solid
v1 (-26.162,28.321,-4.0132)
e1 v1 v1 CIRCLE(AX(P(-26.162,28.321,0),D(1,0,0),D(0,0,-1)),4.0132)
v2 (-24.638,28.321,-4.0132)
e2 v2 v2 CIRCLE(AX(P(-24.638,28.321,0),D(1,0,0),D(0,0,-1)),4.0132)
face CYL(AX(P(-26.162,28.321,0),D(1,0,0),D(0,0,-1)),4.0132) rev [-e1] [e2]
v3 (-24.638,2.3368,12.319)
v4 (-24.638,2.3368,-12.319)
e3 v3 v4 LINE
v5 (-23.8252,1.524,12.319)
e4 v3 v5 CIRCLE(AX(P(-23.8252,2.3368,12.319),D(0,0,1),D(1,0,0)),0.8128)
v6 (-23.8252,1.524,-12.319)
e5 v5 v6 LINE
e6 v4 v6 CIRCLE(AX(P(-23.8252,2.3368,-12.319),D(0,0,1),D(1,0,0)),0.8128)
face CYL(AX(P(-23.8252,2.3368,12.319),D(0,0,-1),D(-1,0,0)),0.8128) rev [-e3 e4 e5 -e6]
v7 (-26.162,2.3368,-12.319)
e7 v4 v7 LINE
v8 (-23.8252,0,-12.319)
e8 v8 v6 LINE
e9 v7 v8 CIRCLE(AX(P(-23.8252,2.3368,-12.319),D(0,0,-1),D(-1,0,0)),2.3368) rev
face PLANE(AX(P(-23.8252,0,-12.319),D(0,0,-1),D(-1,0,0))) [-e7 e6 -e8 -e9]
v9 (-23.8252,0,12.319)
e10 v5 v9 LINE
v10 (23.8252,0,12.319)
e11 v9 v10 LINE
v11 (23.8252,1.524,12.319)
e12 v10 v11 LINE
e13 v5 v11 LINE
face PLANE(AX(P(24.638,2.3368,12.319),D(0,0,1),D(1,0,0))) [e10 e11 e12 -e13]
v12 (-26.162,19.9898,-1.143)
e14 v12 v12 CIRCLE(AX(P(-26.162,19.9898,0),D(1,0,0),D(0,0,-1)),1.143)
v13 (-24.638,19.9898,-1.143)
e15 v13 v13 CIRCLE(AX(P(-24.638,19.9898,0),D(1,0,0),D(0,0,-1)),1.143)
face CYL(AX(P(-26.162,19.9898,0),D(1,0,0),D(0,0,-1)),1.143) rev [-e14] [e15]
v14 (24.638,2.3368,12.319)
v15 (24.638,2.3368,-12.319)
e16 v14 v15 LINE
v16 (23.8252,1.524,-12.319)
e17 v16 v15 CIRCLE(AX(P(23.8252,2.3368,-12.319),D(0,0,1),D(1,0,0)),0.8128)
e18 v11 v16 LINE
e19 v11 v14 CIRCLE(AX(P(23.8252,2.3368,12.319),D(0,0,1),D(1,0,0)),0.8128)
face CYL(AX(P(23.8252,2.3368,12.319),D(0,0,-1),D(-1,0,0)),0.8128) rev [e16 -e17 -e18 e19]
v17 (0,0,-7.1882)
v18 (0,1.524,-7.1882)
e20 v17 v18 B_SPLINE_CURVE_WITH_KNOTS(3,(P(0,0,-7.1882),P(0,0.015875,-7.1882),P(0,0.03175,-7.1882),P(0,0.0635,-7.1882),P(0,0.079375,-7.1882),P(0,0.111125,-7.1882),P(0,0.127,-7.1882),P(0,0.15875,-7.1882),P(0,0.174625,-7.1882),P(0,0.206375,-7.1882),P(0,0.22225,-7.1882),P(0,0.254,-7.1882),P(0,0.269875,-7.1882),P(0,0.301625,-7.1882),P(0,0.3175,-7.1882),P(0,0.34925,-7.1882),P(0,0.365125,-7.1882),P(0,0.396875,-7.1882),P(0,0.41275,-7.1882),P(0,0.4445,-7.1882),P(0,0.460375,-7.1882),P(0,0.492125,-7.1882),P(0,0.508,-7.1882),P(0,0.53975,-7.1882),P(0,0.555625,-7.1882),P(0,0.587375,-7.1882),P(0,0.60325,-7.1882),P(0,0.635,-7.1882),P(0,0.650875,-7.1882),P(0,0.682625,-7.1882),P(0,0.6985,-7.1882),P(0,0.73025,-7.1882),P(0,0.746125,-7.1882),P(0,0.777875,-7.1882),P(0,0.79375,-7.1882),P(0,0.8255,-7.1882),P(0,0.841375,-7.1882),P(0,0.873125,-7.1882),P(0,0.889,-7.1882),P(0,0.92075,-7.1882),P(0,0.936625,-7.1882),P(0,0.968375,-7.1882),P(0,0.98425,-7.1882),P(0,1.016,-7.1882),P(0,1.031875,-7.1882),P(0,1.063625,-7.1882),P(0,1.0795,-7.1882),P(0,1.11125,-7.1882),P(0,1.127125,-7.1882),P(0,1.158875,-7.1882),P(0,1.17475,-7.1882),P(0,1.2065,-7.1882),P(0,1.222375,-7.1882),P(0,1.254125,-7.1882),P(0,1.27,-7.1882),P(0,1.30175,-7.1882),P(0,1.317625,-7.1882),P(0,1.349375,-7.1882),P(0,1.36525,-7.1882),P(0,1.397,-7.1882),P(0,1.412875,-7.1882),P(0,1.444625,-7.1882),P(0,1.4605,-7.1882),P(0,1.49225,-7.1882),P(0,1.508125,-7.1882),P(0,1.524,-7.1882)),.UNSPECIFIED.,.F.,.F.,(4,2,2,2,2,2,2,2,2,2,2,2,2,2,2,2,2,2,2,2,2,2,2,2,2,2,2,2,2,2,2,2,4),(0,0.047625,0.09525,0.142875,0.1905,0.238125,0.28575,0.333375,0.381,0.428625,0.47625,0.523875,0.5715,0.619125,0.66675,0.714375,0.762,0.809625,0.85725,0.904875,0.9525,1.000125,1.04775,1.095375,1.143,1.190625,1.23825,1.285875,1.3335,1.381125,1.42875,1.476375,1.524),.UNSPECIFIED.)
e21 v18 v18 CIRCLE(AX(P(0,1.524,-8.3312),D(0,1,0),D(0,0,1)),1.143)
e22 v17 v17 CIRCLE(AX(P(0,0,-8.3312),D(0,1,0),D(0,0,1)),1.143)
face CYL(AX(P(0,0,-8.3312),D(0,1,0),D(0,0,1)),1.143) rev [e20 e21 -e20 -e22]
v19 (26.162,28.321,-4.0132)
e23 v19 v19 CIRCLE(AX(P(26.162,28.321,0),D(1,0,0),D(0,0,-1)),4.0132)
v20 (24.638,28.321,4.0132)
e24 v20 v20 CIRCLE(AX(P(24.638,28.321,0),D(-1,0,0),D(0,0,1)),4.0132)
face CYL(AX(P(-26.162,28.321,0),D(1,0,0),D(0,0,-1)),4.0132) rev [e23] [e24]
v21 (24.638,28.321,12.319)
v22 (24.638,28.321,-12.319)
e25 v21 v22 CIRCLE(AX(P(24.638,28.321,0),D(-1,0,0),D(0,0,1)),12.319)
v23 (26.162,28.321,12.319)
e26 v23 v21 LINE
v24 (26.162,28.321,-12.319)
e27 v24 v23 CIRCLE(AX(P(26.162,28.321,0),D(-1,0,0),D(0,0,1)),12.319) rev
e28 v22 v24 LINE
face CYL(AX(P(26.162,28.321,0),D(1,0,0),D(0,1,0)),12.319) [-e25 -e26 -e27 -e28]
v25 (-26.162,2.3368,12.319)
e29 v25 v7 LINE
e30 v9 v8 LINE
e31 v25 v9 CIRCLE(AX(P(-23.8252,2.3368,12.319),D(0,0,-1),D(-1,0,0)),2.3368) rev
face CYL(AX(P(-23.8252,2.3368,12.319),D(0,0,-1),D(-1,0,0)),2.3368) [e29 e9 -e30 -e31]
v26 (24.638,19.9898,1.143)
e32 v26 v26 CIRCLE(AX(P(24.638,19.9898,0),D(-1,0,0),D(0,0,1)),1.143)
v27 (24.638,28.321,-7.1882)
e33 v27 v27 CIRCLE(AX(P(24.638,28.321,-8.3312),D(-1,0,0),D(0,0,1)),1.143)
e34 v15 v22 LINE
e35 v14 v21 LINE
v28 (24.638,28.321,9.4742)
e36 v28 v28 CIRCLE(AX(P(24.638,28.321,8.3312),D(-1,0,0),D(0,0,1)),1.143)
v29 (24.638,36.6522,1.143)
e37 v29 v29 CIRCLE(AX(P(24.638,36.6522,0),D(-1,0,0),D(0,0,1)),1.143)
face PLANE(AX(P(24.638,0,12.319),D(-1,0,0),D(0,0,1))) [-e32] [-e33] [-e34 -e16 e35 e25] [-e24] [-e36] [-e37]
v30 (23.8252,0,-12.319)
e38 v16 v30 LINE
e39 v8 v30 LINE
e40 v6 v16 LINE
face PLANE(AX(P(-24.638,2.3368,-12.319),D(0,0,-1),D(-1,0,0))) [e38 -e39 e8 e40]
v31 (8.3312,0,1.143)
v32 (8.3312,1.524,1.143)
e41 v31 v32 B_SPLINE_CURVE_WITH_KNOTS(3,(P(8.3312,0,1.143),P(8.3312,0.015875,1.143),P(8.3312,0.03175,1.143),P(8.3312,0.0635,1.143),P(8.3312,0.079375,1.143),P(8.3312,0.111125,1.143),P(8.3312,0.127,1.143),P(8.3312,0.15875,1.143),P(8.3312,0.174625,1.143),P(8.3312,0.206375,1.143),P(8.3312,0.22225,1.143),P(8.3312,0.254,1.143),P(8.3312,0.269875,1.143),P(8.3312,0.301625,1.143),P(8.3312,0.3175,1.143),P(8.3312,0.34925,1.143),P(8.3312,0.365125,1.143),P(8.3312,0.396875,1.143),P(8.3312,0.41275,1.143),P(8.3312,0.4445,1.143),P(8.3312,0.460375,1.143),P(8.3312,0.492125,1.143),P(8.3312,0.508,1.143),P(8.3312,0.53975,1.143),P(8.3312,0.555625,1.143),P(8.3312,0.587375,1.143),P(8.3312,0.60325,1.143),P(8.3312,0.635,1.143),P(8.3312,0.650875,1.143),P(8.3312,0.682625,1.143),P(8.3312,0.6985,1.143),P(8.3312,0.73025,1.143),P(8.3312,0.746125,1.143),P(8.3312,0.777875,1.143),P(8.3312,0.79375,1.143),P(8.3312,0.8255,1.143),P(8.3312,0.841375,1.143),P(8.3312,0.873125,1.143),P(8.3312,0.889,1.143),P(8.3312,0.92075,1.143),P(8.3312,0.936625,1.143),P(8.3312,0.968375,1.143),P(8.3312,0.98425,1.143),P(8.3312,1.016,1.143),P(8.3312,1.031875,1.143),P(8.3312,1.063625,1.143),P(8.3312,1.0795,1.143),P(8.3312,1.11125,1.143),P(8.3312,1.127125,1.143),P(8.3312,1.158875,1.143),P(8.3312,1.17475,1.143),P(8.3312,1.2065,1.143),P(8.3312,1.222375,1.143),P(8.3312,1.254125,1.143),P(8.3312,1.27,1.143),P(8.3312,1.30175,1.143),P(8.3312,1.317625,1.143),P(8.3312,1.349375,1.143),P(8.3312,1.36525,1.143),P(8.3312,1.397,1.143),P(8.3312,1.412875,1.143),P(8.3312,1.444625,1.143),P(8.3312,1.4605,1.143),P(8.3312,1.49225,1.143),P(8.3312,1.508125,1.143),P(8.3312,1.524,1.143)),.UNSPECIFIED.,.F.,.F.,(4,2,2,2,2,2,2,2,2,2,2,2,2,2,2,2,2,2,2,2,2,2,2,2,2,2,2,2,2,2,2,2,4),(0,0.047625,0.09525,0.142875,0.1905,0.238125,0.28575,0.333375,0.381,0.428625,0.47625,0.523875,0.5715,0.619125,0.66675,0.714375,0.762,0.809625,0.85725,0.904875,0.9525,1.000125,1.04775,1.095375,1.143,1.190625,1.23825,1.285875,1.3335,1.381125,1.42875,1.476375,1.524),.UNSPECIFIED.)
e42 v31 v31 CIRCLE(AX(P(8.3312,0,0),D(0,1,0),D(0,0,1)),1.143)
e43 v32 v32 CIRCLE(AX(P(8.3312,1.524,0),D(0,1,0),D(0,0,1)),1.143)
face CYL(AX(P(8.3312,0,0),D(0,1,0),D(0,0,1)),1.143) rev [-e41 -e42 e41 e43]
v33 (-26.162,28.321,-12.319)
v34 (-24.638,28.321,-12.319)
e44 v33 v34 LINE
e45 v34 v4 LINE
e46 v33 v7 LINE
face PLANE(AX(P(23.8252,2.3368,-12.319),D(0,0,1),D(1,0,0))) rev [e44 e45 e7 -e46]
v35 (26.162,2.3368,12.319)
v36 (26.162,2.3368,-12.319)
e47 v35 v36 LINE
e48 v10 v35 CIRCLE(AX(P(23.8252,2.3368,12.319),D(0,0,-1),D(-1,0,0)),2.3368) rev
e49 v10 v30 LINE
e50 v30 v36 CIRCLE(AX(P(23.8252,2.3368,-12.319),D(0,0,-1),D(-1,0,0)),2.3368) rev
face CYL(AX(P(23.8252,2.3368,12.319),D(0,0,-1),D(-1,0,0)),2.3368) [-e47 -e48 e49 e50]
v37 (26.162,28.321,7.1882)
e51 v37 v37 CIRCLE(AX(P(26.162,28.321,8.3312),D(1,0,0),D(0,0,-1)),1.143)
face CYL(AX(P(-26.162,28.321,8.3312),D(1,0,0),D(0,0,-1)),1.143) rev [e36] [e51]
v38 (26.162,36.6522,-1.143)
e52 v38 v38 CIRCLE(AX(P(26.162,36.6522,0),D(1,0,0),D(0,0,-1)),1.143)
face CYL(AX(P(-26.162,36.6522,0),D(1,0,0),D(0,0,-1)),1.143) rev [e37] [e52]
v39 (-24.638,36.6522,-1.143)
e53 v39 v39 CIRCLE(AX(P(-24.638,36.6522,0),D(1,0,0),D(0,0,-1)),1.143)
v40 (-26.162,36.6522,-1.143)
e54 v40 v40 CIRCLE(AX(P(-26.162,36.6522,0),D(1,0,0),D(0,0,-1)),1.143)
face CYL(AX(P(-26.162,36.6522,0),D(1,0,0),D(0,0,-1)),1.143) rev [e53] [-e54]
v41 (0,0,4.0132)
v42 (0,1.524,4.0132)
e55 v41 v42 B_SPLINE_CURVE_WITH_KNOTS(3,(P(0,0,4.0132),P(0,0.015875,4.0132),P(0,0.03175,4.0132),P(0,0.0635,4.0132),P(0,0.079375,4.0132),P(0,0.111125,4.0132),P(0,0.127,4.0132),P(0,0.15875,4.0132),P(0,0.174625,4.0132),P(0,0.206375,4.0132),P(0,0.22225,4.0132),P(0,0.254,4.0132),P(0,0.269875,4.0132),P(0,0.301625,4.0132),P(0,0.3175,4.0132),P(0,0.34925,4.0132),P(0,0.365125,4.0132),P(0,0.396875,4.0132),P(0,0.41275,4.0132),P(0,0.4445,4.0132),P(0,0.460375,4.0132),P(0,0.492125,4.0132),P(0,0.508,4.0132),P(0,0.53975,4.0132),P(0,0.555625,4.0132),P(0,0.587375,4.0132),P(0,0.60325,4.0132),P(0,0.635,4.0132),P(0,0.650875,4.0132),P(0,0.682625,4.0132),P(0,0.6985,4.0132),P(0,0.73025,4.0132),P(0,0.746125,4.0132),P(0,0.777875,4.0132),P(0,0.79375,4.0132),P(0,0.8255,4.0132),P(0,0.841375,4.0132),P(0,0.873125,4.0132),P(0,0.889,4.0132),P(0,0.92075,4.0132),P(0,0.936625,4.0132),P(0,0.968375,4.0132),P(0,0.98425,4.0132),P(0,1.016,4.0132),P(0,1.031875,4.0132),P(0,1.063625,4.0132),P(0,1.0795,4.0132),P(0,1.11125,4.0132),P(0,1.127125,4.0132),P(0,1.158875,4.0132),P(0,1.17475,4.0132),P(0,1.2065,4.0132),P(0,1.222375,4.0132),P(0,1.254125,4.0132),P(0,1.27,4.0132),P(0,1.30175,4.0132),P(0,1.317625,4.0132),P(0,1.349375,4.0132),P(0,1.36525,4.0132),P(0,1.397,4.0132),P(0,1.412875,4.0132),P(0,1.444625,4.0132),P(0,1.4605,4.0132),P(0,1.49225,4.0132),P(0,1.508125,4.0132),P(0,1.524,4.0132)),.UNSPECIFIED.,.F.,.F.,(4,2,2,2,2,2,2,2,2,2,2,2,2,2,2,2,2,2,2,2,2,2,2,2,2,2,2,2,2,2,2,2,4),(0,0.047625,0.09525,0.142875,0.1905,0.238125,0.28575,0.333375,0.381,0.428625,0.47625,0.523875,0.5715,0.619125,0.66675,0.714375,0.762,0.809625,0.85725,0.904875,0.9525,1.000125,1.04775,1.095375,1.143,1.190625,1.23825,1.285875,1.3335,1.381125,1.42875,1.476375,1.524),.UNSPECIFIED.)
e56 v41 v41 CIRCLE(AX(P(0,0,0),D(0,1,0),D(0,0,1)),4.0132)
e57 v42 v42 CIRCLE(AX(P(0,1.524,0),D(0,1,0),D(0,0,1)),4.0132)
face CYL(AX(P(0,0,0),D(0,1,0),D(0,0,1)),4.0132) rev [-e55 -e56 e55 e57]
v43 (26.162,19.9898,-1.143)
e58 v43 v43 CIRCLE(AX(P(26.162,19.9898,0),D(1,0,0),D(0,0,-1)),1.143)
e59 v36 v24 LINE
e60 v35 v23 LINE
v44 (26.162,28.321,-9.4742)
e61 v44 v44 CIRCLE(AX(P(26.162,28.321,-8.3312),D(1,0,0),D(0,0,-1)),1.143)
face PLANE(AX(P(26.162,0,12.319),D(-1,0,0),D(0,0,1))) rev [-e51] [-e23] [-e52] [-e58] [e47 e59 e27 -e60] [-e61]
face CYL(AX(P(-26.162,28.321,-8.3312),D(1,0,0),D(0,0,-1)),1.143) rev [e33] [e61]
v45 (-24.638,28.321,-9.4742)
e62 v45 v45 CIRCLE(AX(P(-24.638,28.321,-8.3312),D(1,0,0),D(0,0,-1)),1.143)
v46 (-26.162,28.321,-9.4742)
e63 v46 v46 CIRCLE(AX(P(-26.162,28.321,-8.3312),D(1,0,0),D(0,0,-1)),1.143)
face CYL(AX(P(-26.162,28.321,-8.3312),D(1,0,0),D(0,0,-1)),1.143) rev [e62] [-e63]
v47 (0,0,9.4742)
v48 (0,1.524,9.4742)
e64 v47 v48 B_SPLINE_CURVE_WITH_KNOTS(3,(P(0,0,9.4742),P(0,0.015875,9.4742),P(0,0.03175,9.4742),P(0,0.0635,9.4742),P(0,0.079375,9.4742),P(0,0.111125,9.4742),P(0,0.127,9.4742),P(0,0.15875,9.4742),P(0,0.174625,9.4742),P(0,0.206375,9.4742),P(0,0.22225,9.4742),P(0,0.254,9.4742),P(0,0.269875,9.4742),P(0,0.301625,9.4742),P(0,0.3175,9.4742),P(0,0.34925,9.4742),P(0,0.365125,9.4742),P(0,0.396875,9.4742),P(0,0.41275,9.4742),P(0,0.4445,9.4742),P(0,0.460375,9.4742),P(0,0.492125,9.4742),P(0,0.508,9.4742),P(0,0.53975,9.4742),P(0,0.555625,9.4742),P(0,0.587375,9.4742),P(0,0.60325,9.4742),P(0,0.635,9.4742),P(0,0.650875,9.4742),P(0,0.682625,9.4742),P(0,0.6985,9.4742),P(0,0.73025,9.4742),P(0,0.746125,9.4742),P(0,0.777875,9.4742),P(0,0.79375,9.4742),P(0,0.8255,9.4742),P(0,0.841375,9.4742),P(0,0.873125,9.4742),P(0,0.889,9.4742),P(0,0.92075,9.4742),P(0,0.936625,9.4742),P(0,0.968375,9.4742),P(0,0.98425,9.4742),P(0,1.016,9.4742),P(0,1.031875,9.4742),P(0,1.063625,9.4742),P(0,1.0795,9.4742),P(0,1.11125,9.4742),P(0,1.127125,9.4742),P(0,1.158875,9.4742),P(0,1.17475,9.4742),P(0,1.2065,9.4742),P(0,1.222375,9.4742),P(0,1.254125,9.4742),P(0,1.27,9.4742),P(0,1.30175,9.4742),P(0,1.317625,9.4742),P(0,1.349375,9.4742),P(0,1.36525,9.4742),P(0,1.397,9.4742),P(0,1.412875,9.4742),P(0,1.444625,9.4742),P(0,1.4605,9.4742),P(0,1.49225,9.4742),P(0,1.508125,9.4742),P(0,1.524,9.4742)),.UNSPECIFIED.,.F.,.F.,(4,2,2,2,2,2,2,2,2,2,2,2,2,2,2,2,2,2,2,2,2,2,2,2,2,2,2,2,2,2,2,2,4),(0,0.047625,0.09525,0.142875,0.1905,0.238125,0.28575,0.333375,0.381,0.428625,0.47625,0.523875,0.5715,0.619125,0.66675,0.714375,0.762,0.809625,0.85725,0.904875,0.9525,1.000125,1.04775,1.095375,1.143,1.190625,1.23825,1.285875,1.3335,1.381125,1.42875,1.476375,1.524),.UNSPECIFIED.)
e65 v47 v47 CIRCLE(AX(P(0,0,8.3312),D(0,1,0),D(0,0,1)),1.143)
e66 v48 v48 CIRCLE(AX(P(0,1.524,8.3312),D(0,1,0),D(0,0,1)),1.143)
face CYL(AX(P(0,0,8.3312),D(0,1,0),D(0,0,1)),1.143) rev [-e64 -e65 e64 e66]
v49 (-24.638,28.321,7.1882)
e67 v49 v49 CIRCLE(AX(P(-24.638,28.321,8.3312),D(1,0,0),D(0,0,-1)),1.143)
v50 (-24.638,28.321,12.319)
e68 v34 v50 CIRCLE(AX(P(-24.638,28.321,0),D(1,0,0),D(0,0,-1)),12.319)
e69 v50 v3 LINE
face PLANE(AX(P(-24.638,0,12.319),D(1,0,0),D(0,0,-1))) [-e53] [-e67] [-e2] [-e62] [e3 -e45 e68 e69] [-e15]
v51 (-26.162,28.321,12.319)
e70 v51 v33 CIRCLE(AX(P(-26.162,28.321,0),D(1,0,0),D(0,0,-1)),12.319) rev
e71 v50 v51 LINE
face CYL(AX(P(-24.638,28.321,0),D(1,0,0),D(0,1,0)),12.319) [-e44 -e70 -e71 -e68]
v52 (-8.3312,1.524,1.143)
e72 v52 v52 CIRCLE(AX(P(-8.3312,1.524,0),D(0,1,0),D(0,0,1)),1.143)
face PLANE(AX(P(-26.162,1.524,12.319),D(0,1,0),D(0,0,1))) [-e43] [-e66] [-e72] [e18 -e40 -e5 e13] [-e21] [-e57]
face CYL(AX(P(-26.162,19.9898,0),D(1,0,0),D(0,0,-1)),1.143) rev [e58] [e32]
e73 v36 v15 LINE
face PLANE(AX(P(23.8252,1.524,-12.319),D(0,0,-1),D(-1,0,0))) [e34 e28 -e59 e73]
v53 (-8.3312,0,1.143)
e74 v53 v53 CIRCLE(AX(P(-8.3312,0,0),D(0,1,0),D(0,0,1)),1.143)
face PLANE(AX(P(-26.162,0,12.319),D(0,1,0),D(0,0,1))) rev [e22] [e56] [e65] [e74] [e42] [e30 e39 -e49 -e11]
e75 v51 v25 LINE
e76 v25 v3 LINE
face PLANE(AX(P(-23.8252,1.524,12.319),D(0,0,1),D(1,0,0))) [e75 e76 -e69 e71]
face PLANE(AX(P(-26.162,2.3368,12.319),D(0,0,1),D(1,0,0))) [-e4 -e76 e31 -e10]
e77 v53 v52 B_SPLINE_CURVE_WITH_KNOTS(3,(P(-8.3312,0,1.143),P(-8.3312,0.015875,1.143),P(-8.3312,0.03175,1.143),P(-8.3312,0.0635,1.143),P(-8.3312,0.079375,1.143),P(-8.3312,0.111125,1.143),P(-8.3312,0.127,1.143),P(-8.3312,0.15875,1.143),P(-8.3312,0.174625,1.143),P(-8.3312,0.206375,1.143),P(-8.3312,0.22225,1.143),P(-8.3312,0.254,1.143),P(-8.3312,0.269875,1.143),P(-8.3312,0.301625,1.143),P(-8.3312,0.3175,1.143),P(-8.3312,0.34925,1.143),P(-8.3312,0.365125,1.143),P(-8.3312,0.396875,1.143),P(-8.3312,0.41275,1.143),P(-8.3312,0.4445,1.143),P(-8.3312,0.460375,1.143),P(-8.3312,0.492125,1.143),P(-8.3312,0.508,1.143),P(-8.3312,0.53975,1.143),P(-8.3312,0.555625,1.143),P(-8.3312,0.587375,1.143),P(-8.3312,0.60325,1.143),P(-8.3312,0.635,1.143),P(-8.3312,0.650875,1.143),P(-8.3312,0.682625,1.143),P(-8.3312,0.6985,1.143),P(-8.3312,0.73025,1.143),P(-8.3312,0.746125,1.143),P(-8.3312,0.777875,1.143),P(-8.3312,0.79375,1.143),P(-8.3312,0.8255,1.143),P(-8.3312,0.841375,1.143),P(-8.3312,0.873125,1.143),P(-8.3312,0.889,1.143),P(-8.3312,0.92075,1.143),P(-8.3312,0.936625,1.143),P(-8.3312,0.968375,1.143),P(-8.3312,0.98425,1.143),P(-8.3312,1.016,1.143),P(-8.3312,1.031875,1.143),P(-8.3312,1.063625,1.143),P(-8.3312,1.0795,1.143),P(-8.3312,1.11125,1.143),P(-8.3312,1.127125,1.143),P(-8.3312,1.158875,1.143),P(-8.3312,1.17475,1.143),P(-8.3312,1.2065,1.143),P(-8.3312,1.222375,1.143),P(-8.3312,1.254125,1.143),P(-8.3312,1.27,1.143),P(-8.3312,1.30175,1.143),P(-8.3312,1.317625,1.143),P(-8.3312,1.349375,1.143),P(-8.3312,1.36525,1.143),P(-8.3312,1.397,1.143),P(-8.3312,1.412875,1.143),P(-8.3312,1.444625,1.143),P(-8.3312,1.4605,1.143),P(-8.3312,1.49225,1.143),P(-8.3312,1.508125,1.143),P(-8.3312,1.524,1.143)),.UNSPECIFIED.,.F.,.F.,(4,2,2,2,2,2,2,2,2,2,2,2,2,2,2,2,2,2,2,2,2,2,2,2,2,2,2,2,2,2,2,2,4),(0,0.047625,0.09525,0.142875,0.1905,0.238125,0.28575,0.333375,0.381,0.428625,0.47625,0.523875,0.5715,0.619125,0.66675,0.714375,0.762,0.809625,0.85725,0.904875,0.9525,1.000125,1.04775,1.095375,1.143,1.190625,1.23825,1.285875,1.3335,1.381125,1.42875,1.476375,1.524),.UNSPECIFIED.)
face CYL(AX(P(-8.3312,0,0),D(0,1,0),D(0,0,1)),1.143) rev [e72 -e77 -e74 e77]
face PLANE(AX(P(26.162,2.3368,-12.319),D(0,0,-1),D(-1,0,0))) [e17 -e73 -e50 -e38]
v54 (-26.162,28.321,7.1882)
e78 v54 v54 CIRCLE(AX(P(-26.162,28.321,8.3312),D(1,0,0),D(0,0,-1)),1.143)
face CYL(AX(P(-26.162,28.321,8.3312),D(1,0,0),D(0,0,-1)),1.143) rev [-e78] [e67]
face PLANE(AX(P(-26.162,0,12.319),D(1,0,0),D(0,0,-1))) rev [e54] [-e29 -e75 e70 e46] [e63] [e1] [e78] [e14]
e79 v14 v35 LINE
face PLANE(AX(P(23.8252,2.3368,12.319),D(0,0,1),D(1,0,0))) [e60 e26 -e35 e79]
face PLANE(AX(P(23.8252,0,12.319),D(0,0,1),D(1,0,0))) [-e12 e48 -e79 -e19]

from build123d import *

# Parameters (mm, degrees)
BASE_FLANGE1_DEPTH = 12.319
FILLET1_RADIUS     = 12.319
FILLET1_LENGTH     = 1.524
FILLET2_RADIUS     = 12.319
FILLET2_LENGTH     = 1.524
SKETCH3_R          = 4.0132
SKETCH3_R_2        = 1.143
EXTRUDE1_DEPTH     = 68.388191377
SKETCH4_R          = 4.0132
SKETCH4_R_2        = 1.143
EXTRUDE2_DEPTH     = 1.524


# Sheet-metal steps are written as plain solids
with BuildPart() as part:
    # Sketch1 → Base-Flange1 (new, symmetric)
    with BuildSketch(Plane.XY):
        with BuildLine():
            Line((-26.162, 40.64), (-26.162, 2.3368))
            ThreePointArc((-26.162, 2.3368), (-25.477567126, 0.684432874), (-23.8252, 0))
            Line((-23.8252, 0), (23.8252, 0))
            ThreePointArc((23.8252, 0), (25.477567126, 0.684432874), (26.162, 2.3368))
            Line((26.162, 2.3368), (26.162, 40.64))
            Line((26.162, 40.64), (24.638, 40.64))
            Line((24.638, 40.64), (24.638, 2.3368))
            ThreePointArc((24.638, 2.3368), (24.399936392, 1.762063608), (23.8252, 1.524))
            Line((23.8252, 1.524), (-23.8252, 1.524))
            ThreePointArc((-23.8252, 1.524), (-24.399936392, 1.762063608), (-24.638, 2.3368))
            Line((-24.638, 2.3368), (-24.638, 40.64))
            Line((-24.638, 40.64), (-26.162, 40.64))
        make_face()
    extrude(amount=BASE_FLANGE1_DEPTH, both=True)

    # Fillet1: full round fillet: the end face becomes a half cylinder, R = half its width
    fillet1_face = Plane((-25.4, 40.64, 0), x_dir=(-1, 0, 0), z_dir=(0, 1, 0))  # on the end face: x along it, z out of the body
    fillet1_slab = fillet1_face.offset(-FILLET1_RADIUS / 2) * Box(FILLET1_LENGTH, 2 * FILLET1_RADIUS, FILLET1_RADIUS, mode=Mode.PRIVATE)  # the body's end, R deep
    fillet1_round = Plane((-25.4, 28.321, 0), x_dir=(0, 1, 0), z_dir=(-1, 0, 0)) * Cylinder(FILLET1_RADIUS, FILLET1_LENGTH, mode=Mode.PRIVATE)  # its axis R under the face
    add(fillet1_slab - fillet1_round, mode=Mode.SUBTRACT)

    # Fillet2: full round fillet: the end face becomes a half cylinder, R = half its width
    fillet2_face = Plane((25.4, 40.64, 0), x_dir=(-1, 0, 0), z_dir=(0, 1, 0))  # on the end face: x along it, z out of the body
    fillet2_slab = fillet2_face.offset(-FILLET2_RADIUS / 2) * Box(FILLET2_LENGTH, 2 * FILLET2_RADIUS, FILLET2_RADIUS, mode=Mode.PRIVATE)  # the body's end, R deep
    fillet2_round = Plane((25.4, 28.321, 0), x_dir=(0, 1, 0), z_dir=(-1, 0, 0)) * Cylinder(FILLET2_RADIUS, FILLET2_LENGTH, mode=Mode.PRIVATE)  # its axis R under the face
    add(fillet2_slab - fillet2_round, mode=Mode.SUBTRACT)

    # Sketch3 → Extrude1 (cut, through all)
    with BuildSketch(Plane(origin=(26.162, 0, 0), x_dir=(0, 0, -1), z_dir=(1, 0, 0))):
        with Locations((0, 28.321)):
            Circle(SKETCH3_R)
        with Locations((0, 36.6522)):
            Circle(SKETCH3_R_2)
        with Locations((8.3312, 28.321)):
            Circle(SKETCH3_R_2)
        with Locations((0, 19.9898)):
            Circle(SKETCH3_R_2)
        with Locations((-8.3312, 28.321)):
            Circle(SKETCH3_R_2)
    extrude(amount=-EXTRUDE1_DEPTH, mode=Mode.SUBTRACT)

    # Sketch4 → Extrude2 (cut)
    with BuildSketch(Plane(origin=(0, 1.524, 0), x_dir=(1, 0, 0), z_dir=(0, 1, 0))):
        with Locations(Location((0, 0, 0), (0, 0, 270))):
            Circle(SKETCH4_R)
        with Locations(Location((0, 8.3312, 0), (0, 0, 270))):
            Circle(SKETCH4_R_2)
        with Locations(Location((8.3312, 0, 0), (0, 0, 270))):
            Circle(SKETCH4_R_2)
        with Locations(Location((0, -8.3312, 0), (0, 0, 270))):
            Circle(SKETCH4_R_2)
        with Locations(Location((-8.3312, 0, 0), (0, 0, 270))):
            Circle(SKETCH4_R_2)
    extrude(amount=-EXTRUDE2_DEPTH, mode=Mode.SUBTRACT)


solid = part.part
